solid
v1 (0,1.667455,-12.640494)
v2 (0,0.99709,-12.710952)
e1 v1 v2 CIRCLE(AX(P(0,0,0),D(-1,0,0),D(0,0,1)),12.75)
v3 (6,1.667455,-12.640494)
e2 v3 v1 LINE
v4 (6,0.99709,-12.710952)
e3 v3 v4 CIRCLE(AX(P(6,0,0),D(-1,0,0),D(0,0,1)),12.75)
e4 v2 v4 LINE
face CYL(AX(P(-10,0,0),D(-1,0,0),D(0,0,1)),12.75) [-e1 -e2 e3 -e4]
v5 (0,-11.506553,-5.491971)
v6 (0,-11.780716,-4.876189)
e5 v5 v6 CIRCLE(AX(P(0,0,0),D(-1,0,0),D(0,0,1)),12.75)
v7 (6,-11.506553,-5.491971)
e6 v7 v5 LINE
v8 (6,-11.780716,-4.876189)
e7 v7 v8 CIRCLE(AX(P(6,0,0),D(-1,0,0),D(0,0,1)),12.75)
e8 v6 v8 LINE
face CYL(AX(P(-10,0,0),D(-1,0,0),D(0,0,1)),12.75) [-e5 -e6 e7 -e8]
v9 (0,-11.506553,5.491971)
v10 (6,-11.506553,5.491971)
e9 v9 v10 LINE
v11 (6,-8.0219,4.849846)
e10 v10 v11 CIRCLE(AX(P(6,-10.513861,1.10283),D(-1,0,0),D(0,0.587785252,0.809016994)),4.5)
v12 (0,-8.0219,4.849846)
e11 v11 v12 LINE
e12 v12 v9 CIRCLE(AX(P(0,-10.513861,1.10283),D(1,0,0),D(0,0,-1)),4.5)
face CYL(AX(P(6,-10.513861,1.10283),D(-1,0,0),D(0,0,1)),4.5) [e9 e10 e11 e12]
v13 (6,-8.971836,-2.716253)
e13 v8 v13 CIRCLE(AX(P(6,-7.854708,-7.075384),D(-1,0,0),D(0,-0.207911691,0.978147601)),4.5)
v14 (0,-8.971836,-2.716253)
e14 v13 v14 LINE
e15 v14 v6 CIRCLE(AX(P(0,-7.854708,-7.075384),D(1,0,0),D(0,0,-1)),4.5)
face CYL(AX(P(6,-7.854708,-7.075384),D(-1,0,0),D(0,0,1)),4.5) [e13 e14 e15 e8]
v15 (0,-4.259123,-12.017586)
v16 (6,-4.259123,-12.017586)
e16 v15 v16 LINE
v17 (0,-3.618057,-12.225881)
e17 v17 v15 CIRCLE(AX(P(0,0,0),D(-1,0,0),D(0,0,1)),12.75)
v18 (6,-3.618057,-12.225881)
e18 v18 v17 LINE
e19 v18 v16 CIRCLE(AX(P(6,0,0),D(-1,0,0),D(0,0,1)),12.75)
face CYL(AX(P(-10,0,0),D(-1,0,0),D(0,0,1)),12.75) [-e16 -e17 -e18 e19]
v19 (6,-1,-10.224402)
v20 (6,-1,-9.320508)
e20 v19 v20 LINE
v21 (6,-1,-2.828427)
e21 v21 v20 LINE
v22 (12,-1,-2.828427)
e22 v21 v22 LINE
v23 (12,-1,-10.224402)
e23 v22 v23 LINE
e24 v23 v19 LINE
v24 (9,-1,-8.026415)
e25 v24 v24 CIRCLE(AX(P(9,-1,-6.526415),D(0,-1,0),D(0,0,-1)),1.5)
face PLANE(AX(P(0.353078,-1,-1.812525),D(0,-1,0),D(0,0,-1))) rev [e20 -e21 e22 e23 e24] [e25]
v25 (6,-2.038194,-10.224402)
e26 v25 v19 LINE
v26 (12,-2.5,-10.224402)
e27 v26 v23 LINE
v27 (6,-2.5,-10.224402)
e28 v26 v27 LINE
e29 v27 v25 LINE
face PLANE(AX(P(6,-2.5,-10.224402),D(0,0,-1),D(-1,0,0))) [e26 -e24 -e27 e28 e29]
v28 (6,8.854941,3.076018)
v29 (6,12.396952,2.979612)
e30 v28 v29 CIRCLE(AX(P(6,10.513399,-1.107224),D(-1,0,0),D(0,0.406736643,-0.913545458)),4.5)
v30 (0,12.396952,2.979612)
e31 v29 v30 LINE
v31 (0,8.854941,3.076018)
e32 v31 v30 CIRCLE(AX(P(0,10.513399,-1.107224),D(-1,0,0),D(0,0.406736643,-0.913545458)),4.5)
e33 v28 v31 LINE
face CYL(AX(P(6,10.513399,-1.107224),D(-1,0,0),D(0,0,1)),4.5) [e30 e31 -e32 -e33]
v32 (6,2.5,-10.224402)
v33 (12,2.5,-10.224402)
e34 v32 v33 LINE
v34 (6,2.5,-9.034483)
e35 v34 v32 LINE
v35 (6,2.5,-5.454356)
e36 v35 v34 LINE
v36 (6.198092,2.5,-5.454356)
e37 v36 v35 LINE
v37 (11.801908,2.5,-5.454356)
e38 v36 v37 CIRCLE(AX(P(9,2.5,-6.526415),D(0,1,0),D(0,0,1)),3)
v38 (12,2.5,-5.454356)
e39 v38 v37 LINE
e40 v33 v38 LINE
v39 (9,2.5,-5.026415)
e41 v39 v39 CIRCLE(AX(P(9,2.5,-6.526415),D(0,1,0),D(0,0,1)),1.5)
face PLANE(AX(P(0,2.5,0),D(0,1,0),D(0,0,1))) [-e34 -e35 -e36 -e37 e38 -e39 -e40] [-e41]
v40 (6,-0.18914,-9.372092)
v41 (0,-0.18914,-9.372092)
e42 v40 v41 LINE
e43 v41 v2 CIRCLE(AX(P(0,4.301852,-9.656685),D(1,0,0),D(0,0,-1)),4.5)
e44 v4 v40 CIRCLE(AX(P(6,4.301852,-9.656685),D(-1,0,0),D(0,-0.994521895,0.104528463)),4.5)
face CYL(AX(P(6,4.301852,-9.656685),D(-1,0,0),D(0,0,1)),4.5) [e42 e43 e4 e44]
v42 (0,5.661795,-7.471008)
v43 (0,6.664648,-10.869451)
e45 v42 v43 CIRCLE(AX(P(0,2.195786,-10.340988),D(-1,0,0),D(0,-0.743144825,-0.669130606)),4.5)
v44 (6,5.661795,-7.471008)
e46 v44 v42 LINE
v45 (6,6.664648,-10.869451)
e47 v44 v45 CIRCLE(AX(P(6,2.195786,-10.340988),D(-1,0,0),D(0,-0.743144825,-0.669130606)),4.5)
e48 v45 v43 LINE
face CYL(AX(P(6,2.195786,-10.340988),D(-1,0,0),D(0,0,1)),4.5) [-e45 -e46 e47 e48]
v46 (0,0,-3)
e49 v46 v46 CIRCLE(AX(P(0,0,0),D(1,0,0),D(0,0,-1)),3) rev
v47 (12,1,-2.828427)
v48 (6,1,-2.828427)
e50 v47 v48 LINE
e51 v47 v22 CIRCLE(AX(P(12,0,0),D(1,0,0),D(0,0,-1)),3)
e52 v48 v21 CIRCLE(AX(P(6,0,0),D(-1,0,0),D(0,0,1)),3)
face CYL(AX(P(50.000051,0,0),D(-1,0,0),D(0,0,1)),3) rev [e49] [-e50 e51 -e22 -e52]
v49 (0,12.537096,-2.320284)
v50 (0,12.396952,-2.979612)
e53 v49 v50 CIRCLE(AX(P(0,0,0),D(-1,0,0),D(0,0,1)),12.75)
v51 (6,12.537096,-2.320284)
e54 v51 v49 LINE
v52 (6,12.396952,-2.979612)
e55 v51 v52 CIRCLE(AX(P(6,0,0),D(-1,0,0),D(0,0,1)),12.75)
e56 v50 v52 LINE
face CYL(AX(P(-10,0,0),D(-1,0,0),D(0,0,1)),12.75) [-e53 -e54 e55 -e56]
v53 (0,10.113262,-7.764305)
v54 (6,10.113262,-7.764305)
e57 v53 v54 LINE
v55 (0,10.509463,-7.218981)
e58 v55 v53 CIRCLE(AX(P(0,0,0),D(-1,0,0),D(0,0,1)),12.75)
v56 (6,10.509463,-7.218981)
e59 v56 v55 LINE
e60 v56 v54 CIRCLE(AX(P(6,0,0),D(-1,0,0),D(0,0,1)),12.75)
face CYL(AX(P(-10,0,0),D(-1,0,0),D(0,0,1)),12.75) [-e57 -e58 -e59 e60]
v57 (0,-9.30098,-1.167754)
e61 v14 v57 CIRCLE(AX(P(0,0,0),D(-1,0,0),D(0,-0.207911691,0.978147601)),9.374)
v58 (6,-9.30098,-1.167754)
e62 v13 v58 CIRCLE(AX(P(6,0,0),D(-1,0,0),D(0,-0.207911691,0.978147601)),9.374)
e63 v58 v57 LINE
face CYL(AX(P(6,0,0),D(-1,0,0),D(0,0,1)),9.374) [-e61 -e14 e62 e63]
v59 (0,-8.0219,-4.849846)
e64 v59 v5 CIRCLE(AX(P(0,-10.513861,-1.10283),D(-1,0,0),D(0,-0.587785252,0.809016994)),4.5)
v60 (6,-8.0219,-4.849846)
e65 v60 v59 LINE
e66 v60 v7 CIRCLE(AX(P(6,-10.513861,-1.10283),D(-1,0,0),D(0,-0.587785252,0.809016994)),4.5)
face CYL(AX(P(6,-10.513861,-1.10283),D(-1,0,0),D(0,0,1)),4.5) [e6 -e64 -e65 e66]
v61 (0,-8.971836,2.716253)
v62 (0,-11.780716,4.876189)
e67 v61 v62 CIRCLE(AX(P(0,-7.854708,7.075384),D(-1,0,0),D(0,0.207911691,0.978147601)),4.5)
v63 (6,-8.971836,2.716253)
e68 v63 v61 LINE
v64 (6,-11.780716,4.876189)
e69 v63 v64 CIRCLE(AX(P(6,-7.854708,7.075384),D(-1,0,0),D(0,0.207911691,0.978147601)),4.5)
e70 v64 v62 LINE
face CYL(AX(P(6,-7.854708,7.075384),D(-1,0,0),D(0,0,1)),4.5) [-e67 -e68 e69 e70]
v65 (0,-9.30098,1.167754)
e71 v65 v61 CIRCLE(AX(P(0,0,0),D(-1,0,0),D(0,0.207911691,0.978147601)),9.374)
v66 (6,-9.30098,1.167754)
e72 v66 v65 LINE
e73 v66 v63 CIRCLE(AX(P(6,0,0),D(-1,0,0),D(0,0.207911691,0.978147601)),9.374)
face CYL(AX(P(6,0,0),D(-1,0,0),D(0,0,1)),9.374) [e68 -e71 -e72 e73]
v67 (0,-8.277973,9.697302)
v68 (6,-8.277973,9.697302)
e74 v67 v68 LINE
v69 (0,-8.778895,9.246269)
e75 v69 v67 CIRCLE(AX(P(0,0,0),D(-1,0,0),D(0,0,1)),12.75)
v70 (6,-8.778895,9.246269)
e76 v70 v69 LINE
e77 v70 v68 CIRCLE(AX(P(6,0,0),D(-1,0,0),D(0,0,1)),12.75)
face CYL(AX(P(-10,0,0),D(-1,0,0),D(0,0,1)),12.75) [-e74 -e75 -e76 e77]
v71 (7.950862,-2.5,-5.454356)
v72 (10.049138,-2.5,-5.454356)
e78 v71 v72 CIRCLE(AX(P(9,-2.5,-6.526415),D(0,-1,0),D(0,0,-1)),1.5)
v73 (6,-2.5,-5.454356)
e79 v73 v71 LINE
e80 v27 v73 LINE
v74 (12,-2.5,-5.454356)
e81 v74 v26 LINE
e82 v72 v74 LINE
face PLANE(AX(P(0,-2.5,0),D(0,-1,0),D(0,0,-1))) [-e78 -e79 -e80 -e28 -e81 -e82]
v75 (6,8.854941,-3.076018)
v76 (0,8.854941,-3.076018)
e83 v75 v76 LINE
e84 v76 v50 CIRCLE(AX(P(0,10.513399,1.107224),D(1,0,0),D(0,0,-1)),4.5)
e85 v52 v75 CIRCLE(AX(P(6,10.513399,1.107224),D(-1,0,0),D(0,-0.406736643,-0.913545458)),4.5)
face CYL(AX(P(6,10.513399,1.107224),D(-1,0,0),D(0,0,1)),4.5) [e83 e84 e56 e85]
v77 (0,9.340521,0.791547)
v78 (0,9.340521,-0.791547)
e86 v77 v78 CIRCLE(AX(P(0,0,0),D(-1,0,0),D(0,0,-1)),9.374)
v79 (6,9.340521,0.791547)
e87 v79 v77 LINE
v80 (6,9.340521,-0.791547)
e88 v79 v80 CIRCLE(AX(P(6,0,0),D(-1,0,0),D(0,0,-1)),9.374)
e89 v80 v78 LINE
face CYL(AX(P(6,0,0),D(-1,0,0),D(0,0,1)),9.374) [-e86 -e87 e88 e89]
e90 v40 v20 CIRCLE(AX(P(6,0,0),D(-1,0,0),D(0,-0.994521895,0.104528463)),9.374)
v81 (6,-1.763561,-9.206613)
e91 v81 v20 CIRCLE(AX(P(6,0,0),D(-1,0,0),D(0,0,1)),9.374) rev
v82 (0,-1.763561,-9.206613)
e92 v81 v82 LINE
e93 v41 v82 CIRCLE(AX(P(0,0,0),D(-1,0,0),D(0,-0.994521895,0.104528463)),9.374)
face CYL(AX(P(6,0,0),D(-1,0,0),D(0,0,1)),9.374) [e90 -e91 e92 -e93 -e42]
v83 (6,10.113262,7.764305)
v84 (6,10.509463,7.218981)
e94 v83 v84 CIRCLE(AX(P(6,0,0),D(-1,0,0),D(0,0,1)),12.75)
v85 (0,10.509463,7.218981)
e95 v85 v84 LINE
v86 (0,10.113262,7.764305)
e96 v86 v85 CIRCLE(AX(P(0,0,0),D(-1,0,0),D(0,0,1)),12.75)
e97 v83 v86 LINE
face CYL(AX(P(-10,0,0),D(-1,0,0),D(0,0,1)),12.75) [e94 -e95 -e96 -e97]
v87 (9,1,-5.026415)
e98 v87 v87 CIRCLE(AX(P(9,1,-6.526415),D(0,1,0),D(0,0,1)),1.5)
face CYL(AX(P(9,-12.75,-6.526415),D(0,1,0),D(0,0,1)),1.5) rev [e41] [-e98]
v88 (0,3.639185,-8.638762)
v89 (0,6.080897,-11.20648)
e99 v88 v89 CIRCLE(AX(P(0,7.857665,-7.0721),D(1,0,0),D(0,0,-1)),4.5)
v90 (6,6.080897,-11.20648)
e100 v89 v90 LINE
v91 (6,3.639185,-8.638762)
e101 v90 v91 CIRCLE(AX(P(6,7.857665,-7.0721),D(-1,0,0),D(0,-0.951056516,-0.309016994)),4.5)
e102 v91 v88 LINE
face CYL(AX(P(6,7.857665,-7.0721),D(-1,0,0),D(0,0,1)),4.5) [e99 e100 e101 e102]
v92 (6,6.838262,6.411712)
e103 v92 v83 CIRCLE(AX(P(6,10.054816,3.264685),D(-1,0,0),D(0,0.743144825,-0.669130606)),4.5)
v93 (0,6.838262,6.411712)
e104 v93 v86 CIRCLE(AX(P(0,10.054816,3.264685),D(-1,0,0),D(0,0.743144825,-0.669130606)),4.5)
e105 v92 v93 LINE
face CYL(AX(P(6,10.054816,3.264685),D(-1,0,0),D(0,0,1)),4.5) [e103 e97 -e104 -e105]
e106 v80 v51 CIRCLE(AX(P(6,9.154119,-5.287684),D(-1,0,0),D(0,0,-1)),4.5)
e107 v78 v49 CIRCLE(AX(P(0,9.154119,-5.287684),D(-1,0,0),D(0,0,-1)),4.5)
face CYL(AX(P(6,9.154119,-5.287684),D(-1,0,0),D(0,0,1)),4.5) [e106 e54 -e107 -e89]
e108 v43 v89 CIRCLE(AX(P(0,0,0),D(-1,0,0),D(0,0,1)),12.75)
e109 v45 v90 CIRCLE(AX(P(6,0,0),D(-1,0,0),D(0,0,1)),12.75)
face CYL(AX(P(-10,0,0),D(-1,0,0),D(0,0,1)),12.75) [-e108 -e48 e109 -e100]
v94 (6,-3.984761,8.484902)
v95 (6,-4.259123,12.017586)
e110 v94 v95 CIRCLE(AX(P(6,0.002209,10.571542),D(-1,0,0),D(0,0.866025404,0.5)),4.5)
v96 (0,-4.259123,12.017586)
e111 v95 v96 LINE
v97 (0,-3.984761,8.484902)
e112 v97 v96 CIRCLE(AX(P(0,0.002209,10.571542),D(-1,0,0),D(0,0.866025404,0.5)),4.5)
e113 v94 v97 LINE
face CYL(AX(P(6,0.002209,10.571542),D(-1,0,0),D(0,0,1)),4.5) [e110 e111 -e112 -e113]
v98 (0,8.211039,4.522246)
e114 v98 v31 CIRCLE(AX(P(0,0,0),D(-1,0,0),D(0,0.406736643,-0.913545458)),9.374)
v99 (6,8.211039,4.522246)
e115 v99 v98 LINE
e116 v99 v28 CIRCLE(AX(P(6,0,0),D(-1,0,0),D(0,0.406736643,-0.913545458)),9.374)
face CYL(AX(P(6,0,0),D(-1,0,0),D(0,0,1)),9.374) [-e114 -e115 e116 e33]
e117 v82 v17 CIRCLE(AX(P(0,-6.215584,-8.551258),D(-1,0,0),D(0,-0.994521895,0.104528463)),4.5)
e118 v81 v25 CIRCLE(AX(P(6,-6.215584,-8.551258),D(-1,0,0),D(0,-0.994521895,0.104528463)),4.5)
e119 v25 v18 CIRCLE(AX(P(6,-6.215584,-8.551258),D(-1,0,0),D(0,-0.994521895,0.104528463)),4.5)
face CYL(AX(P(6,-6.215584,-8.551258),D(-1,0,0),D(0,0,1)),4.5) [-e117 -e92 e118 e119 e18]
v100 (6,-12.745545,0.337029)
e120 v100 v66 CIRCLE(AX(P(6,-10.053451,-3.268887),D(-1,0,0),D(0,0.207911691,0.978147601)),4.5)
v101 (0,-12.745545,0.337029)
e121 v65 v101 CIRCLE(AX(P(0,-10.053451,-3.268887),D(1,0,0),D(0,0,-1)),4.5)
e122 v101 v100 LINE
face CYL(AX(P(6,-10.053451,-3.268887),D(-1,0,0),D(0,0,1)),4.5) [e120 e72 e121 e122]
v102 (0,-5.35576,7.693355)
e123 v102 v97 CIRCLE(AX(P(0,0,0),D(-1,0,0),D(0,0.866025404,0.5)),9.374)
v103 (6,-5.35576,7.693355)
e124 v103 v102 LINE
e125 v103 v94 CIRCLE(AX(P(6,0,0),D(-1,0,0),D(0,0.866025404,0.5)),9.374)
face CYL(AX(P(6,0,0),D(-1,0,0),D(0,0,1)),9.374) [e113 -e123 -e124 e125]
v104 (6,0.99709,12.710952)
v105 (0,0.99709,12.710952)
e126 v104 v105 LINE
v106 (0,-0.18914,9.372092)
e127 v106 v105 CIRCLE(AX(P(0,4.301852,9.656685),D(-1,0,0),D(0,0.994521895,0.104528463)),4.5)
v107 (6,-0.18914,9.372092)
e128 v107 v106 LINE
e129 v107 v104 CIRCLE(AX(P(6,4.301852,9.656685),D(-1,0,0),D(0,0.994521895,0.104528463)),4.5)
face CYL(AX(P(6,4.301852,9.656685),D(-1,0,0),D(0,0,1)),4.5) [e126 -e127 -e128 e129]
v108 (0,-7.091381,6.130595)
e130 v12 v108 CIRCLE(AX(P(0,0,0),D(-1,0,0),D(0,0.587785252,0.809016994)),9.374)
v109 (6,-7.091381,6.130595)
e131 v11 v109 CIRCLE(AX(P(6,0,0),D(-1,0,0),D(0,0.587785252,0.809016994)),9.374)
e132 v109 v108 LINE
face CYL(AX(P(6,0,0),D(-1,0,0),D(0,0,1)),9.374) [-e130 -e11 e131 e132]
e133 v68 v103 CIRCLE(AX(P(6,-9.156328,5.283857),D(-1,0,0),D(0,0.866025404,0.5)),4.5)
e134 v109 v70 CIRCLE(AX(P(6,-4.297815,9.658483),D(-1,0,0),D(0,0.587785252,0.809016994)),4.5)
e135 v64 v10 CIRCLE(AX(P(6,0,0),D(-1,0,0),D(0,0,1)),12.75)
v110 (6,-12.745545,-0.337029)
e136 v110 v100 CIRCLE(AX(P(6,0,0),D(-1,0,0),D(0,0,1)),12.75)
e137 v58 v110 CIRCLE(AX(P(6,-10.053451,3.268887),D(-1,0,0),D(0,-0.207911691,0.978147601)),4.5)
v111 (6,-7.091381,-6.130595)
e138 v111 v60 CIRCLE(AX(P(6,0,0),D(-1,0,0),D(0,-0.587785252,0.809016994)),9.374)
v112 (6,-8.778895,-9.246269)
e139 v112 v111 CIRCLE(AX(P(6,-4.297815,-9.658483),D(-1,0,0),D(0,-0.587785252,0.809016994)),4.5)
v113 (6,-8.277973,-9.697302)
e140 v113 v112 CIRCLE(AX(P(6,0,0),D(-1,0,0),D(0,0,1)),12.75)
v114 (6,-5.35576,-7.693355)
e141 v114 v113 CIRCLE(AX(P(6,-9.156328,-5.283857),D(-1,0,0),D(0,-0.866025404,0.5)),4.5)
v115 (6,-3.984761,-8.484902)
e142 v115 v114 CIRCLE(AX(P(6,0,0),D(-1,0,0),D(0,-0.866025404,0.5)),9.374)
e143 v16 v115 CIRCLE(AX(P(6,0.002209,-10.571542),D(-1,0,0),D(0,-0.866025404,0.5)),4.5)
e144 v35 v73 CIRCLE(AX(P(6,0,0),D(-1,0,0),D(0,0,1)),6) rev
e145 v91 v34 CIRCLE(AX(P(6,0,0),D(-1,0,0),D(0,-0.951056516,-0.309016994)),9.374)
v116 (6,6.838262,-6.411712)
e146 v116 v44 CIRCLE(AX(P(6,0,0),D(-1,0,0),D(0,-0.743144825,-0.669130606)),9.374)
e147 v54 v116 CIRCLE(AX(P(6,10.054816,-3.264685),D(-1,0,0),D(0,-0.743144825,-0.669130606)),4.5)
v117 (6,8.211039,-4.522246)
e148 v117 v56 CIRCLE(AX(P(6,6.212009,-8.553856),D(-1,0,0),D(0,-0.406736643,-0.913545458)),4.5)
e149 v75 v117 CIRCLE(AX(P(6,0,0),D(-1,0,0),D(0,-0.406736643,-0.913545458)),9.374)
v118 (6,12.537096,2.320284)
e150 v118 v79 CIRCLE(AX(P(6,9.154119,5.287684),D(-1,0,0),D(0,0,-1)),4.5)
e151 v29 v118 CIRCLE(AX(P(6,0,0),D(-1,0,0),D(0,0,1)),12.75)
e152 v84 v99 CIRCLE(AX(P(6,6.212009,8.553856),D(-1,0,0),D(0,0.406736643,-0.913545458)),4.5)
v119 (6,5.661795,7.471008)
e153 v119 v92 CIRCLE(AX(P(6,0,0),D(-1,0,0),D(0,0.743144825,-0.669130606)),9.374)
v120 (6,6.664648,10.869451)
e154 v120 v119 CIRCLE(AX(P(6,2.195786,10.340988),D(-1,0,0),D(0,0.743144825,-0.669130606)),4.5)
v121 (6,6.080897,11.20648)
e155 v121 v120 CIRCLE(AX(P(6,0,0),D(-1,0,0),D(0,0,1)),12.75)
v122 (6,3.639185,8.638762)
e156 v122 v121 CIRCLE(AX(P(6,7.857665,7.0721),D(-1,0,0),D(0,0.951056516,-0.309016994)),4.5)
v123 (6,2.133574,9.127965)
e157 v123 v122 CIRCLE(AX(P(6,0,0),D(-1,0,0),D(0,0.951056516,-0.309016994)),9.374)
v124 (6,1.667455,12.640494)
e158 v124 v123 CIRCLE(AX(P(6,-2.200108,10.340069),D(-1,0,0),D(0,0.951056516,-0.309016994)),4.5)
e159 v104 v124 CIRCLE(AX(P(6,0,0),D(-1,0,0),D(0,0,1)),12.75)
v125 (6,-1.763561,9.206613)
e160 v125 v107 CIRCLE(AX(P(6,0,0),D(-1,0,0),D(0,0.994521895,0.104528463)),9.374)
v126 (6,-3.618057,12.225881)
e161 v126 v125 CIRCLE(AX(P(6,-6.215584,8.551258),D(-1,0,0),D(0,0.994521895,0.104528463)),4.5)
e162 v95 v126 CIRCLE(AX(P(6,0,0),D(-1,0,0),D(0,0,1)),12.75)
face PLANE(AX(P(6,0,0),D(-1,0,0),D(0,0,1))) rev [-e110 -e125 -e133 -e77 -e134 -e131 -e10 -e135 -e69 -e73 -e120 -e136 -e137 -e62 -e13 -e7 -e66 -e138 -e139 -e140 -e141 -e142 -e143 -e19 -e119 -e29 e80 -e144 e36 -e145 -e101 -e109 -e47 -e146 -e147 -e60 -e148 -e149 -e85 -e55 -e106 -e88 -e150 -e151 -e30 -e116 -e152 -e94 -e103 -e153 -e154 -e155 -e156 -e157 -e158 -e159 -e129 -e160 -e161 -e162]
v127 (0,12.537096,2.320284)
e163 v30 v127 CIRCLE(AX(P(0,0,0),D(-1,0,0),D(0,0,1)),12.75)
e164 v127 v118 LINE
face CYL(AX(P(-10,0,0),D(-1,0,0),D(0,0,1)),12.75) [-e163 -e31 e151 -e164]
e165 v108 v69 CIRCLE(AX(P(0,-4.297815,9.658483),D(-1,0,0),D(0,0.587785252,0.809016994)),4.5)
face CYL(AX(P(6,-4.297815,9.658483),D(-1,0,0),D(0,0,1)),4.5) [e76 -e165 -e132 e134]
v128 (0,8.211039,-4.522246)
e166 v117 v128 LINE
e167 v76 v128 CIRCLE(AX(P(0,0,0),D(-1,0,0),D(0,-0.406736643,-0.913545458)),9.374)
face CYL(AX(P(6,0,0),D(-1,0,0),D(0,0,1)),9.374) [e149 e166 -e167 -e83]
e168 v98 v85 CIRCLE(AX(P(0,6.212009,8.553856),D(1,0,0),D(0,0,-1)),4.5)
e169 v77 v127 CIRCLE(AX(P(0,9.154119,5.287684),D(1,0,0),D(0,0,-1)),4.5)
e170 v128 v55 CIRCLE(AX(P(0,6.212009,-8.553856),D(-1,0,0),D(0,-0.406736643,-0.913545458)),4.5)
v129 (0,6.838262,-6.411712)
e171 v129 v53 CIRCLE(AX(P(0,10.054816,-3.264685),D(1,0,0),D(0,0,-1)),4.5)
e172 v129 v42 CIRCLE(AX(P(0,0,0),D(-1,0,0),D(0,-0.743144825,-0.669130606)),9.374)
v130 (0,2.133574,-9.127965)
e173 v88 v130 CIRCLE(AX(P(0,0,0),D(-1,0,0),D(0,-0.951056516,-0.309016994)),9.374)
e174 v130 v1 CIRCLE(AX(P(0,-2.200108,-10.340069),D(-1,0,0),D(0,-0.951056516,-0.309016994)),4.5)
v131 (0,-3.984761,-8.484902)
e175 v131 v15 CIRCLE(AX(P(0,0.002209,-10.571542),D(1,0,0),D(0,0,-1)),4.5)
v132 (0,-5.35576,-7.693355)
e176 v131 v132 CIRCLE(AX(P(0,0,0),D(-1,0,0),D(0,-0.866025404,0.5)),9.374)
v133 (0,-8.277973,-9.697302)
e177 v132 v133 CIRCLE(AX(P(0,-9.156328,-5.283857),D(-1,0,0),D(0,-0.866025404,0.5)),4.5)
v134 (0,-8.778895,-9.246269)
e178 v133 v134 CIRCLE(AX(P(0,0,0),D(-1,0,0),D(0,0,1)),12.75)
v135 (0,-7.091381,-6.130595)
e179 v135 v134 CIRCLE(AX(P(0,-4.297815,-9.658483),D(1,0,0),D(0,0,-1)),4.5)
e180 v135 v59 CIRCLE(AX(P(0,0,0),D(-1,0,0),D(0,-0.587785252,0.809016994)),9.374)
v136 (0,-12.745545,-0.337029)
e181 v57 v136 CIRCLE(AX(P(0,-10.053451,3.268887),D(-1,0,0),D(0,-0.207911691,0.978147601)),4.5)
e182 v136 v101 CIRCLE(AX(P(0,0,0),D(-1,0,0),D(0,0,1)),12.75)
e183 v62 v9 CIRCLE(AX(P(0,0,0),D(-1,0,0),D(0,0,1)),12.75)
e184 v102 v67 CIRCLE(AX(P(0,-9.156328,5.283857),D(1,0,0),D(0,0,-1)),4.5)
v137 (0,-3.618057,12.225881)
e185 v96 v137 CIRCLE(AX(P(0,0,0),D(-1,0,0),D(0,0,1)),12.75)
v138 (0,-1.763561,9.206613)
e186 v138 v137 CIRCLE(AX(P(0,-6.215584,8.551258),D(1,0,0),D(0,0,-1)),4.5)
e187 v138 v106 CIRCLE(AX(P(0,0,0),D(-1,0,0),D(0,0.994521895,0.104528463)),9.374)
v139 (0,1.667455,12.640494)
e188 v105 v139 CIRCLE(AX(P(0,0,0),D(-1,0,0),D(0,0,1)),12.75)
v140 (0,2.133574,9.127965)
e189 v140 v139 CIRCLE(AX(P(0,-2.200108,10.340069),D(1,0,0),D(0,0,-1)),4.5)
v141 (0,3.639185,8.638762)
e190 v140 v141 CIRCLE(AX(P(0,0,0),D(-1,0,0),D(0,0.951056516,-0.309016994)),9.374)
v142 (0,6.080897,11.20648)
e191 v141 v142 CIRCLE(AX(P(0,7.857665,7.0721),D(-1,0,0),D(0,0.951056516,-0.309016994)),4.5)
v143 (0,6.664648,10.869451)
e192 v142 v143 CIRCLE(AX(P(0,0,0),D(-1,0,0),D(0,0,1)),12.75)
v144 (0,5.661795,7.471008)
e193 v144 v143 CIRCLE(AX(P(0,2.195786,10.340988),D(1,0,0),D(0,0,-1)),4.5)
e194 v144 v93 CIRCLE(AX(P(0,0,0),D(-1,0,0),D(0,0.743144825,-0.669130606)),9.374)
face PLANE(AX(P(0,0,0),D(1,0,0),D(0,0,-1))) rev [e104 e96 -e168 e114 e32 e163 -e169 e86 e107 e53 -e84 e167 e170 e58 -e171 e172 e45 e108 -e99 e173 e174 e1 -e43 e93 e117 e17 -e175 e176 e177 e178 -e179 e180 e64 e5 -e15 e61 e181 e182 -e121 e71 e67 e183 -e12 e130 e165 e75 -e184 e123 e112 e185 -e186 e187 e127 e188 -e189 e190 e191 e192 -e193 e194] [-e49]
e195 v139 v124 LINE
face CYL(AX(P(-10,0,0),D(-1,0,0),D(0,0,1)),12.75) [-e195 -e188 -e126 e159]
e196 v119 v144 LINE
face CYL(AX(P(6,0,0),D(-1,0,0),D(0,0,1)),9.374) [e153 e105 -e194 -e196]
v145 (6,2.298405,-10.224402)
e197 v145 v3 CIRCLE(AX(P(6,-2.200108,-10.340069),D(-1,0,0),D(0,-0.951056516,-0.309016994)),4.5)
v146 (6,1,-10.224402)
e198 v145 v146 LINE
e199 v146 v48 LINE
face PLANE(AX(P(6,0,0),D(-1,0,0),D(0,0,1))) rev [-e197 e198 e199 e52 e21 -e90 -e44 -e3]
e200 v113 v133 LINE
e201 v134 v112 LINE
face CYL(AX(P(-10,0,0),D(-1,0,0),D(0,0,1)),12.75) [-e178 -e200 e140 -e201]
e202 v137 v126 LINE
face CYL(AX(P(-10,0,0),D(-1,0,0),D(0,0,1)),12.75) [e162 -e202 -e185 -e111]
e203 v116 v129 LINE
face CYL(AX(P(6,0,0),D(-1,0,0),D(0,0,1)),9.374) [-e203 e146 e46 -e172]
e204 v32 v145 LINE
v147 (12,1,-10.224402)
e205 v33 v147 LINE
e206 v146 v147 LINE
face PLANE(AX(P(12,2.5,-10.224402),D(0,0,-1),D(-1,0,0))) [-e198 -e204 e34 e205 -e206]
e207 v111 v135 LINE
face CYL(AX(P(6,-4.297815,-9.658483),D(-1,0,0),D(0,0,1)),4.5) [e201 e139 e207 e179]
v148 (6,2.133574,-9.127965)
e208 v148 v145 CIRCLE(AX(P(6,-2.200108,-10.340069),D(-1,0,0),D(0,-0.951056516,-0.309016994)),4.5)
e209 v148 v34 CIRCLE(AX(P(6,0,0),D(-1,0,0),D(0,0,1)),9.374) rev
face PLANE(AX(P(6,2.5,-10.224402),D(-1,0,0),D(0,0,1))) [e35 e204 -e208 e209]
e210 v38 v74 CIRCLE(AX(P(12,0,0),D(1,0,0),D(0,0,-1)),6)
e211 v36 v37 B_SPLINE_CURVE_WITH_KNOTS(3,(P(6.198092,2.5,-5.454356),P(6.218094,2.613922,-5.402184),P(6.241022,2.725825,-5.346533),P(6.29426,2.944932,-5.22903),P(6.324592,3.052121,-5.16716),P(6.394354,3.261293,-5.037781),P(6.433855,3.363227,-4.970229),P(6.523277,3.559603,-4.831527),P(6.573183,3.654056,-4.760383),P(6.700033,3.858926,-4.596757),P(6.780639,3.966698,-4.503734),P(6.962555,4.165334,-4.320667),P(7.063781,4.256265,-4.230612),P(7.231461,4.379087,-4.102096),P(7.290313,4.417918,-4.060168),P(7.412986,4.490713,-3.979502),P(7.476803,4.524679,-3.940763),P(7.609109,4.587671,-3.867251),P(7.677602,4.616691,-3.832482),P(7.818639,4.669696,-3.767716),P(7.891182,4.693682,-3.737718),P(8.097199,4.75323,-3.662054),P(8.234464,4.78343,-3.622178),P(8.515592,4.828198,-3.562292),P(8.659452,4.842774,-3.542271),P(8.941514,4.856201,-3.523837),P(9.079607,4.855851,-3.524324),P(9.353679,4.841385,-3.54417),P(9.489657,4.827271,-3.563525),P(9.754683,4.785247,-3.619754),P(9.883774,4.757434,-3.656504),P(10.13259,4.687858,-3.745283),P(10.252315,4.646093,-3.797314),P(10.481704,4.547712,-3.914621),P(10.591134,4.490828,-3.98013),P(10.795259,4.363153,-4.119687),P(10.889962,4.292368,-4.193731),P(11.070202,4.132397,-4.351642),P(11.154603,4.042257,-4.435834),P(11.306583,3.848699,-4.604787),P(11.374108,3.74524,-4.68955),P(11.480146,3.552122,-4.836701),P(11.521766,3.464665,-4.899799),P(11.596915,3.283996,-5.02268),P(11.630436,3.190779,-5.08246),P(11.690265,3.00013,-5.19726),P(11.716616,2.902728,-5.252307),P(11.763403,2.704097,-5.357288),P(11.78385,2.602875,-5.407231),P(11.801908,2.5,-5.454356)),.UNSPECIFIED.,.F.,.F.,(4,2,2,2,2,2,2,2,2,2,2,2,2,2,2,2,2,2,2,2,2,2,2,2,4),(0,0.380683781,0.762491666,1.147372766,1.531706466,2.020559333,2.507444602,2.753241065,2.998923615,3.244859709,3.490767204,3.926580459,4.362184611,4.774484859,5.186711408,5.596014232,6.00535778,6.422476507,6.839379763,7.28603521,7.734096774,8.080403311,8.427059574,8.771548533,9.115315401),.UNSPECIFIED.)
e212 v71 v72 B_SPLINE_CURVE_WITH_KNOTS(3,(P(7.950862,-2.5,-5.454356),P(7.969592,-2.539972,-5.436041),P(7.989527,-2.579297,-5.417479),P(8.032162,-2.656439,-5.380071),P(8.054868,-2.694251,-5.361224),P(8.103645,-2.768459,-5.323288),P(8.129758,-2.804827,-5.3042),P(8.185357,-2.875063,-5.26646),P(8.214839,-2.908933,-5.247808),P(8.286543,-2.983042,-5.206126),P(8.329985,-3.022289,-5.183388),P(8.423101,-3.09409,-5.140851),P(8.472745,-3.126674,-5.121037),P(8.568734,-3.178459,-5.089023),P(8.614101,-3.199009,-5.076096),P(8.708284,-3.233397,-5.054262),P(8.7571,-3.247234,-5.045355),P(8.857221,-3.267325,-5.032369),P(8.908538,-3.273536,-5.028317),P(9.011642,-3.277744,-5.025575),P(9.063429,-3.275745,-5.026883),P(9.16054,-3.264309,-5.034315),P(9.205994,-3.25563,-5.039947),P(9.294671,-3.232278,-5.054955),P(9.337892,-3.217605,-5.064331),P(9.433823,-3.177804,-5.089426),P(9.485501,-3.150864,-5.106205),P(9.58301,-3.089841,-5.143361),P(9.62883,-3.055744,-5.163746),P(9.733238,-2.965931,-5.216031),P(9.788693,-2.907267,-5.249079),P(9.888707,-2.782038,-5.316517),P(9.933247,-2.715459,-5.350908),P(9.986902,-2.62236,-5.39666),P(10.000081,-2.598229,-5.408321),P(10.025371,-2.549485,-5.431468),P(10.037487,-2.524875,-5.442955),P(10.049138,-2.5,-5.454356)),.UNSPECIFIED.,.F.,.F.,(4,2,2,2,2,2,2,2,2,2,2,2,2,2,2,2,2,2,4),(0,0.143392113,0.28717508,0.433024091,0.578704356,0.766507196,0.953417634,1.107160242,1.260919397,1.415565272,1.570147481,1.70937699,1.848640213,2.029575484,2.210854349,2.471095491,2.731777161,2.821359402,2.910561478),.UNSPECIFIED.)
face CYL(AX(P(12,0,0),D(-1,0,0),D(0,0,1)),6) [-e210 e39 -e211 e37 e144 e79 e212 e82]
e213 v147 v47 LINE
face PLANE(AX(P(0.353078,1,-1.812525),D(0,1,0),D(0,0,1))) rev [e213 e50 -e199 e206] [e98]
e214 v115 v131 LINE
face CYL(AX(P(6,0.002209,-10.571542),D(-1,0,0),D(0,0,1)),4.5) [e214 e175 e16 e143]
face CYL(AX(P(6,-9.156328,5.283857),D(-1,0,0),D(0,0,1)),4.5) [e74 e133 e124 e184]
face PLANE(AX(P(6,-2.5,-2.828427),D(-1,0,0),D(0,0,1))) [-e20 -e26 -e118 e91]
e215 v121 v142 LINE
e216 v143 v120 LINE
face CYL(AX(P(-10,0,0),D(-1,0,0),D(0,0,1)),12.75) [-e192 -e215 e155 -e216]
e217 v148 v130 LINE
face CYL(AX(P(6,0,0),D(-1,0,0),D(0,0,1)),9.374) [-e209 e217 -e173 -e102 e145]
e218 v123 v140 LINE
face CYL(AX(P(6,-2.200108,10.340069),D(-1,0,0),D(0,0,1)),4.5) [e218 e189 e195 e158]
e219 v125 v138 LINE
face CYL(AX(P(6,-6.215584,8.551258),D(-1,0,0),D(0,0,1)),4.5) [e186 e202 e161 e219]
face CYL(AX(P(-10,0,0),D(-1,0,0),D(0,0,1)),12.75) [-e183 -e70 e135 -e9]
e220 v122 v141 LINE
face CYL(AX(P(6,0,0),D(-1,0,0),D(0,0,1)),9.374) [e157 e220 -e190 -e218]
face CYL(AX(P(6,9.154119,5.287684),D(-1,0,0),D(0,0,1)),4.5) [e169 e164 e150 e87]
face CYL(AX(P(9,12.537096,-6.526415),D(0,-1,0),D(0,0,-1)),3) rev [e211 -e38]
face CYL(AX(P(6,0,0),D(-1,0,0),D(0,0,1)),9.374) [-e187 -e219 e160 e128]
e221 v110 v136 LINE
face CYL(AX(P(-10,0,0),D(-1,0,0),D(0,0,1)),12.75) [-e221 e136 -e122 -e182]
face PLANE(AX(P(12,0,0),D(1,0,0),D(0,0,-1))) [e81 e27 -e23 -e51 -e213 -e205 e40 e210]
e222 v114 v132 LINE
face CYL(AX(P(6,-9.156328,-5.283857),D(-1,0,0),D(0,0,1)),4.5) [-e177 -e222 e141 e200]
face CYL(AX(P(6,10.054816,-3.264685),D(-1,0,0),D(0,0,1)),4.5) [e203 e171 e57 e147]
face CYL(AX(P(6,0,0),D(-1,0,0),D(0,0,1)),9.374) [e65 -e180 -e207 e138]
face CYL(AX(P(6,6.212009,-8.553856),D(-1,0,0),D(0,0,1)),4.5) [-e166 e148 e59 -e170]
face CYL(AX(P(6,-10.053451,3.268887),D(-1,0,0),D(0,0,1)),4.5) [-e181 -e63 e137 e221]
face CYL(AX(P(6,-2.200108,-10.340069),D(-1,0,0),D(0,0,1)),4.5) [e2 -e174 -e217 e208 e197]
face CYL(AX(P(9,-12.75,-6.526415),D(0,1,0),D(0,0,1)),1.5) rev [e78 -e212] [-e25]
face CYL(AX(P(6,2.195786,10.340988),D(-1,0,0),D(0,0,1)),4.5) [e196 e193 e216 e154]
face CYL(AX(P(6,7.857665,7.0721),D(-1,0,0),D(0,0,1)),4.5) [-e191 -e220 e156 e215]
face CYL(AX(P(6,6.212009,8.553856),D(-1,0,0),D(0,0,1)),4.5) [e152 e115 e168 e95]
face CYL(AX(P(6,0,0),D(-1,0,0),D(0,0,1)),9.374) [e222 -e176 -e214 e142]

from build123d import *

# Parameters (mm, degrees)
BASPROSKE_W             = 6
BASPROSKE_H             = 12.75
TOOTHCUT_DEPTH          = 20.003289189
TEETHCUTS_COUNT         = 15
TEETHCUTS_ANGLE         = 336
BORSKE_R                = 3
BORE_DEPTH              = 50.0000508
BOSS_EXTRUDE2_START     = 6
SKETCH1_R               = 6
SKETCH1_R_2             = 3
BOSS_EXTRUDE2_DEPTH     = 6
CUT_EXTRUDE1_START      = -6.0000001
CUT_EXTRUDE1_OUTLINE_W  = 6
CUT_EXTRUDE1_OUTLINE_H  = 2
CUT_EXTRUDE1_DEPTH      = 3.171572975
SKETCH3_W               = 6
SKETCH3_H               = 7.395975174
BOSS_EXTRUDE3_DEPTH     = 1.5
BOSS_EXTRUDE4_DEPTH     = 1.5
CUT_EXTRUDE2_DEPTH      = 23.109303185
CUT_EXTRUDE2_DEPTH_BACK = 23.109303185
SKETCH6_R               = 1.5
CUT_EXTRUDE3_DEPTH      = 24.197646745


# Read off the part's stored shape, not the designer's step: Cut-Extrude1
with BuildPart() as part:
    # BasProSke → Base-Revolve (revolve)
    with BuildSketch(Plane(origin=(0, 0, 0), x_dir=(1, 0, 0), z_dir=(0, 1, 0)), mode=Mode.PRIVATE) as base_revolve_sk:
        with Locations((3, 6.375)):
            Rectangle(BASPROSKE_W, BASPROSKE_H)
    revolve(base_revolve_sk.sketch.rotate(Axis((-10, 0, 0), (1, 0, 0)), 180), axis=Axis((-10, 0, 0), (1, 0, 0)))

    # TooCutSke → ToothCut (cut, through all)
    with BuildSketch(Plane(origin=(0, 0, 0), x_dir=(0, 0, -1), z_dir=(1, 0, 0))):
        with BuildLine():
            ThreePointArc((0.791546546, 9.340520867), (0, 9.374), (-0.791546546, 9.340520867))
            ThreePointArc((-0.791546546, 9.340520867), (-1.235070734, 11.110218102), (-2.344732916, 12.558386549))
            ThreePointArc((-2.344732916, 12.558386549), (0, 12.7754), (2.344732916, 12.558386549))
            ThreePointArc((2.344732916, 12.558386549), (1.235070734, 11.110218102), (0.791546546, 9.340520867))
        make_face()
    toothcut = extrude(amount=TOOTHCUT_DEPTH, mode=Mode.SUBTRACT)

    # TeethCuts: ToothCut ×15 about axis
    teethcuts_axis = Axis((-10, 0, 0), (1, 0, 0))
    for i in range(1, TEETHCUTS_COUNT):
        add(toothcut.rotate(teethcuts_axis, i * TEETHCUTS_ANGLE / (TEETHCUTS_COUNT - 1)), mode=Mode.SUBTRACT)

    # BorSke → Bore (cut, symmetric)
    with BuildSketch(Plane(origin=(0, 0, 0), x_dir=(0, 0, -1), z_dir=(1, 0, 0))):
        with Locations(Location((0, 0, 0), (0, 0, 180))):
            Circle(BORSKE_R)
    extrude(amount=BORE_DEPTH, both=True, mode=Mode.SUBTRACT)

    # Sketch1 → Boss-Extrude2 (add)
    with BuildSketch(Plane(origin=(6, 0, 0), x_dir=(0, 0, -1), z_dir=(1, 0, 0)).offset(BOSS_EXTRUDE2_START)):
        with Locations(Location((0, 0, 0), (0, 0, 180))):
            Circle(SKETCH1_R)
        Circle(SKETCH1_R_2, mode=Mode.SUBTRACT)
    extrude(amount=-BOSS_EXTRUDE2_DEPTH)

    # Cut-Extrude1 outline → Cut-Extrude1 (cut)
    with BuildSketch(Plane.XY.offset(CUT_EXTRUDE1_START)):
        with Locations((9, 0)):
            Rectangle(CUT_EXTRUDE1_OUTLINE_W, CUT_EXTRUDE1_OUTLINE_H)
    extrude(amount=CUT_EXTRUDE1_DEPTH, mode=Mode.SUBTRACT)

    # Sketch3 → Boss-Extrude3 (add)
    with BuildSketch(Plane(origin=(0, -1, 0), x_dir=(1, 0, 0), z_dir=(0, 1, 0))):
        with Locations((9, 6.526414712)):
            Rectangle(SKETCH3_W, SKETCH3_H)
    extrude(amount=-BOSS_EXTRUDE3_DEPTH)

    # Sketch5 → Boss-Extrude4 (add)
    with BuildSketch(Plane.XZ.offset(-1)):
        Polygon((6, -10.224402299), (6, -9.320508355), (6, -2.828427125), (12, -2.828427125), (12, -10.224402299), align=None)
    extrude(amount=-BOSS_EXTRUDE4_DEPTH)

    # Sketch6 → Cut-Extrude2 (cut, two sides: drawn at the far end of the back side and taken through both)
    with BuildSketch(Plane(origin=(0, -1, 0), x_dir=(1, 0, 0), z_dir=(0, 1, 0)).offset(-CUT_EXTRUDE2_DEPTH_BACK)):
        with Locations(Location((9, 6.526414712, 0), (0, 0, 270))):
            Circle(SKETCH6_R)
    extrude(amount=CUT_EXTRUDE2_DEPTH + CUT_EXTRUDE2_DEPTH_BACK, mode=Mode.SUBTRACT)

    # Sketch7 → Cut-Extrude3 (cut, through all)
    with BuildSketch(Plane(origin=(0, 2.5, 0), x_dir=(1, 0, 0), z_dir=(0, 1, 0))):
        with BuildLine():
            ThreePointArc((6.901724288, 4.382297403), (9, 3.526414712), (11.098275712, 4.382297403))
            ThreePointArc((11.098275712, 4.382297403), (9, 9.526414712), (6.901724288, 4.382297403))
        make_face()
    extrude(amount=CUT_EXTRUDE3_DEPTH, mode=Mode.SUBTRACT)


solid = part.part
